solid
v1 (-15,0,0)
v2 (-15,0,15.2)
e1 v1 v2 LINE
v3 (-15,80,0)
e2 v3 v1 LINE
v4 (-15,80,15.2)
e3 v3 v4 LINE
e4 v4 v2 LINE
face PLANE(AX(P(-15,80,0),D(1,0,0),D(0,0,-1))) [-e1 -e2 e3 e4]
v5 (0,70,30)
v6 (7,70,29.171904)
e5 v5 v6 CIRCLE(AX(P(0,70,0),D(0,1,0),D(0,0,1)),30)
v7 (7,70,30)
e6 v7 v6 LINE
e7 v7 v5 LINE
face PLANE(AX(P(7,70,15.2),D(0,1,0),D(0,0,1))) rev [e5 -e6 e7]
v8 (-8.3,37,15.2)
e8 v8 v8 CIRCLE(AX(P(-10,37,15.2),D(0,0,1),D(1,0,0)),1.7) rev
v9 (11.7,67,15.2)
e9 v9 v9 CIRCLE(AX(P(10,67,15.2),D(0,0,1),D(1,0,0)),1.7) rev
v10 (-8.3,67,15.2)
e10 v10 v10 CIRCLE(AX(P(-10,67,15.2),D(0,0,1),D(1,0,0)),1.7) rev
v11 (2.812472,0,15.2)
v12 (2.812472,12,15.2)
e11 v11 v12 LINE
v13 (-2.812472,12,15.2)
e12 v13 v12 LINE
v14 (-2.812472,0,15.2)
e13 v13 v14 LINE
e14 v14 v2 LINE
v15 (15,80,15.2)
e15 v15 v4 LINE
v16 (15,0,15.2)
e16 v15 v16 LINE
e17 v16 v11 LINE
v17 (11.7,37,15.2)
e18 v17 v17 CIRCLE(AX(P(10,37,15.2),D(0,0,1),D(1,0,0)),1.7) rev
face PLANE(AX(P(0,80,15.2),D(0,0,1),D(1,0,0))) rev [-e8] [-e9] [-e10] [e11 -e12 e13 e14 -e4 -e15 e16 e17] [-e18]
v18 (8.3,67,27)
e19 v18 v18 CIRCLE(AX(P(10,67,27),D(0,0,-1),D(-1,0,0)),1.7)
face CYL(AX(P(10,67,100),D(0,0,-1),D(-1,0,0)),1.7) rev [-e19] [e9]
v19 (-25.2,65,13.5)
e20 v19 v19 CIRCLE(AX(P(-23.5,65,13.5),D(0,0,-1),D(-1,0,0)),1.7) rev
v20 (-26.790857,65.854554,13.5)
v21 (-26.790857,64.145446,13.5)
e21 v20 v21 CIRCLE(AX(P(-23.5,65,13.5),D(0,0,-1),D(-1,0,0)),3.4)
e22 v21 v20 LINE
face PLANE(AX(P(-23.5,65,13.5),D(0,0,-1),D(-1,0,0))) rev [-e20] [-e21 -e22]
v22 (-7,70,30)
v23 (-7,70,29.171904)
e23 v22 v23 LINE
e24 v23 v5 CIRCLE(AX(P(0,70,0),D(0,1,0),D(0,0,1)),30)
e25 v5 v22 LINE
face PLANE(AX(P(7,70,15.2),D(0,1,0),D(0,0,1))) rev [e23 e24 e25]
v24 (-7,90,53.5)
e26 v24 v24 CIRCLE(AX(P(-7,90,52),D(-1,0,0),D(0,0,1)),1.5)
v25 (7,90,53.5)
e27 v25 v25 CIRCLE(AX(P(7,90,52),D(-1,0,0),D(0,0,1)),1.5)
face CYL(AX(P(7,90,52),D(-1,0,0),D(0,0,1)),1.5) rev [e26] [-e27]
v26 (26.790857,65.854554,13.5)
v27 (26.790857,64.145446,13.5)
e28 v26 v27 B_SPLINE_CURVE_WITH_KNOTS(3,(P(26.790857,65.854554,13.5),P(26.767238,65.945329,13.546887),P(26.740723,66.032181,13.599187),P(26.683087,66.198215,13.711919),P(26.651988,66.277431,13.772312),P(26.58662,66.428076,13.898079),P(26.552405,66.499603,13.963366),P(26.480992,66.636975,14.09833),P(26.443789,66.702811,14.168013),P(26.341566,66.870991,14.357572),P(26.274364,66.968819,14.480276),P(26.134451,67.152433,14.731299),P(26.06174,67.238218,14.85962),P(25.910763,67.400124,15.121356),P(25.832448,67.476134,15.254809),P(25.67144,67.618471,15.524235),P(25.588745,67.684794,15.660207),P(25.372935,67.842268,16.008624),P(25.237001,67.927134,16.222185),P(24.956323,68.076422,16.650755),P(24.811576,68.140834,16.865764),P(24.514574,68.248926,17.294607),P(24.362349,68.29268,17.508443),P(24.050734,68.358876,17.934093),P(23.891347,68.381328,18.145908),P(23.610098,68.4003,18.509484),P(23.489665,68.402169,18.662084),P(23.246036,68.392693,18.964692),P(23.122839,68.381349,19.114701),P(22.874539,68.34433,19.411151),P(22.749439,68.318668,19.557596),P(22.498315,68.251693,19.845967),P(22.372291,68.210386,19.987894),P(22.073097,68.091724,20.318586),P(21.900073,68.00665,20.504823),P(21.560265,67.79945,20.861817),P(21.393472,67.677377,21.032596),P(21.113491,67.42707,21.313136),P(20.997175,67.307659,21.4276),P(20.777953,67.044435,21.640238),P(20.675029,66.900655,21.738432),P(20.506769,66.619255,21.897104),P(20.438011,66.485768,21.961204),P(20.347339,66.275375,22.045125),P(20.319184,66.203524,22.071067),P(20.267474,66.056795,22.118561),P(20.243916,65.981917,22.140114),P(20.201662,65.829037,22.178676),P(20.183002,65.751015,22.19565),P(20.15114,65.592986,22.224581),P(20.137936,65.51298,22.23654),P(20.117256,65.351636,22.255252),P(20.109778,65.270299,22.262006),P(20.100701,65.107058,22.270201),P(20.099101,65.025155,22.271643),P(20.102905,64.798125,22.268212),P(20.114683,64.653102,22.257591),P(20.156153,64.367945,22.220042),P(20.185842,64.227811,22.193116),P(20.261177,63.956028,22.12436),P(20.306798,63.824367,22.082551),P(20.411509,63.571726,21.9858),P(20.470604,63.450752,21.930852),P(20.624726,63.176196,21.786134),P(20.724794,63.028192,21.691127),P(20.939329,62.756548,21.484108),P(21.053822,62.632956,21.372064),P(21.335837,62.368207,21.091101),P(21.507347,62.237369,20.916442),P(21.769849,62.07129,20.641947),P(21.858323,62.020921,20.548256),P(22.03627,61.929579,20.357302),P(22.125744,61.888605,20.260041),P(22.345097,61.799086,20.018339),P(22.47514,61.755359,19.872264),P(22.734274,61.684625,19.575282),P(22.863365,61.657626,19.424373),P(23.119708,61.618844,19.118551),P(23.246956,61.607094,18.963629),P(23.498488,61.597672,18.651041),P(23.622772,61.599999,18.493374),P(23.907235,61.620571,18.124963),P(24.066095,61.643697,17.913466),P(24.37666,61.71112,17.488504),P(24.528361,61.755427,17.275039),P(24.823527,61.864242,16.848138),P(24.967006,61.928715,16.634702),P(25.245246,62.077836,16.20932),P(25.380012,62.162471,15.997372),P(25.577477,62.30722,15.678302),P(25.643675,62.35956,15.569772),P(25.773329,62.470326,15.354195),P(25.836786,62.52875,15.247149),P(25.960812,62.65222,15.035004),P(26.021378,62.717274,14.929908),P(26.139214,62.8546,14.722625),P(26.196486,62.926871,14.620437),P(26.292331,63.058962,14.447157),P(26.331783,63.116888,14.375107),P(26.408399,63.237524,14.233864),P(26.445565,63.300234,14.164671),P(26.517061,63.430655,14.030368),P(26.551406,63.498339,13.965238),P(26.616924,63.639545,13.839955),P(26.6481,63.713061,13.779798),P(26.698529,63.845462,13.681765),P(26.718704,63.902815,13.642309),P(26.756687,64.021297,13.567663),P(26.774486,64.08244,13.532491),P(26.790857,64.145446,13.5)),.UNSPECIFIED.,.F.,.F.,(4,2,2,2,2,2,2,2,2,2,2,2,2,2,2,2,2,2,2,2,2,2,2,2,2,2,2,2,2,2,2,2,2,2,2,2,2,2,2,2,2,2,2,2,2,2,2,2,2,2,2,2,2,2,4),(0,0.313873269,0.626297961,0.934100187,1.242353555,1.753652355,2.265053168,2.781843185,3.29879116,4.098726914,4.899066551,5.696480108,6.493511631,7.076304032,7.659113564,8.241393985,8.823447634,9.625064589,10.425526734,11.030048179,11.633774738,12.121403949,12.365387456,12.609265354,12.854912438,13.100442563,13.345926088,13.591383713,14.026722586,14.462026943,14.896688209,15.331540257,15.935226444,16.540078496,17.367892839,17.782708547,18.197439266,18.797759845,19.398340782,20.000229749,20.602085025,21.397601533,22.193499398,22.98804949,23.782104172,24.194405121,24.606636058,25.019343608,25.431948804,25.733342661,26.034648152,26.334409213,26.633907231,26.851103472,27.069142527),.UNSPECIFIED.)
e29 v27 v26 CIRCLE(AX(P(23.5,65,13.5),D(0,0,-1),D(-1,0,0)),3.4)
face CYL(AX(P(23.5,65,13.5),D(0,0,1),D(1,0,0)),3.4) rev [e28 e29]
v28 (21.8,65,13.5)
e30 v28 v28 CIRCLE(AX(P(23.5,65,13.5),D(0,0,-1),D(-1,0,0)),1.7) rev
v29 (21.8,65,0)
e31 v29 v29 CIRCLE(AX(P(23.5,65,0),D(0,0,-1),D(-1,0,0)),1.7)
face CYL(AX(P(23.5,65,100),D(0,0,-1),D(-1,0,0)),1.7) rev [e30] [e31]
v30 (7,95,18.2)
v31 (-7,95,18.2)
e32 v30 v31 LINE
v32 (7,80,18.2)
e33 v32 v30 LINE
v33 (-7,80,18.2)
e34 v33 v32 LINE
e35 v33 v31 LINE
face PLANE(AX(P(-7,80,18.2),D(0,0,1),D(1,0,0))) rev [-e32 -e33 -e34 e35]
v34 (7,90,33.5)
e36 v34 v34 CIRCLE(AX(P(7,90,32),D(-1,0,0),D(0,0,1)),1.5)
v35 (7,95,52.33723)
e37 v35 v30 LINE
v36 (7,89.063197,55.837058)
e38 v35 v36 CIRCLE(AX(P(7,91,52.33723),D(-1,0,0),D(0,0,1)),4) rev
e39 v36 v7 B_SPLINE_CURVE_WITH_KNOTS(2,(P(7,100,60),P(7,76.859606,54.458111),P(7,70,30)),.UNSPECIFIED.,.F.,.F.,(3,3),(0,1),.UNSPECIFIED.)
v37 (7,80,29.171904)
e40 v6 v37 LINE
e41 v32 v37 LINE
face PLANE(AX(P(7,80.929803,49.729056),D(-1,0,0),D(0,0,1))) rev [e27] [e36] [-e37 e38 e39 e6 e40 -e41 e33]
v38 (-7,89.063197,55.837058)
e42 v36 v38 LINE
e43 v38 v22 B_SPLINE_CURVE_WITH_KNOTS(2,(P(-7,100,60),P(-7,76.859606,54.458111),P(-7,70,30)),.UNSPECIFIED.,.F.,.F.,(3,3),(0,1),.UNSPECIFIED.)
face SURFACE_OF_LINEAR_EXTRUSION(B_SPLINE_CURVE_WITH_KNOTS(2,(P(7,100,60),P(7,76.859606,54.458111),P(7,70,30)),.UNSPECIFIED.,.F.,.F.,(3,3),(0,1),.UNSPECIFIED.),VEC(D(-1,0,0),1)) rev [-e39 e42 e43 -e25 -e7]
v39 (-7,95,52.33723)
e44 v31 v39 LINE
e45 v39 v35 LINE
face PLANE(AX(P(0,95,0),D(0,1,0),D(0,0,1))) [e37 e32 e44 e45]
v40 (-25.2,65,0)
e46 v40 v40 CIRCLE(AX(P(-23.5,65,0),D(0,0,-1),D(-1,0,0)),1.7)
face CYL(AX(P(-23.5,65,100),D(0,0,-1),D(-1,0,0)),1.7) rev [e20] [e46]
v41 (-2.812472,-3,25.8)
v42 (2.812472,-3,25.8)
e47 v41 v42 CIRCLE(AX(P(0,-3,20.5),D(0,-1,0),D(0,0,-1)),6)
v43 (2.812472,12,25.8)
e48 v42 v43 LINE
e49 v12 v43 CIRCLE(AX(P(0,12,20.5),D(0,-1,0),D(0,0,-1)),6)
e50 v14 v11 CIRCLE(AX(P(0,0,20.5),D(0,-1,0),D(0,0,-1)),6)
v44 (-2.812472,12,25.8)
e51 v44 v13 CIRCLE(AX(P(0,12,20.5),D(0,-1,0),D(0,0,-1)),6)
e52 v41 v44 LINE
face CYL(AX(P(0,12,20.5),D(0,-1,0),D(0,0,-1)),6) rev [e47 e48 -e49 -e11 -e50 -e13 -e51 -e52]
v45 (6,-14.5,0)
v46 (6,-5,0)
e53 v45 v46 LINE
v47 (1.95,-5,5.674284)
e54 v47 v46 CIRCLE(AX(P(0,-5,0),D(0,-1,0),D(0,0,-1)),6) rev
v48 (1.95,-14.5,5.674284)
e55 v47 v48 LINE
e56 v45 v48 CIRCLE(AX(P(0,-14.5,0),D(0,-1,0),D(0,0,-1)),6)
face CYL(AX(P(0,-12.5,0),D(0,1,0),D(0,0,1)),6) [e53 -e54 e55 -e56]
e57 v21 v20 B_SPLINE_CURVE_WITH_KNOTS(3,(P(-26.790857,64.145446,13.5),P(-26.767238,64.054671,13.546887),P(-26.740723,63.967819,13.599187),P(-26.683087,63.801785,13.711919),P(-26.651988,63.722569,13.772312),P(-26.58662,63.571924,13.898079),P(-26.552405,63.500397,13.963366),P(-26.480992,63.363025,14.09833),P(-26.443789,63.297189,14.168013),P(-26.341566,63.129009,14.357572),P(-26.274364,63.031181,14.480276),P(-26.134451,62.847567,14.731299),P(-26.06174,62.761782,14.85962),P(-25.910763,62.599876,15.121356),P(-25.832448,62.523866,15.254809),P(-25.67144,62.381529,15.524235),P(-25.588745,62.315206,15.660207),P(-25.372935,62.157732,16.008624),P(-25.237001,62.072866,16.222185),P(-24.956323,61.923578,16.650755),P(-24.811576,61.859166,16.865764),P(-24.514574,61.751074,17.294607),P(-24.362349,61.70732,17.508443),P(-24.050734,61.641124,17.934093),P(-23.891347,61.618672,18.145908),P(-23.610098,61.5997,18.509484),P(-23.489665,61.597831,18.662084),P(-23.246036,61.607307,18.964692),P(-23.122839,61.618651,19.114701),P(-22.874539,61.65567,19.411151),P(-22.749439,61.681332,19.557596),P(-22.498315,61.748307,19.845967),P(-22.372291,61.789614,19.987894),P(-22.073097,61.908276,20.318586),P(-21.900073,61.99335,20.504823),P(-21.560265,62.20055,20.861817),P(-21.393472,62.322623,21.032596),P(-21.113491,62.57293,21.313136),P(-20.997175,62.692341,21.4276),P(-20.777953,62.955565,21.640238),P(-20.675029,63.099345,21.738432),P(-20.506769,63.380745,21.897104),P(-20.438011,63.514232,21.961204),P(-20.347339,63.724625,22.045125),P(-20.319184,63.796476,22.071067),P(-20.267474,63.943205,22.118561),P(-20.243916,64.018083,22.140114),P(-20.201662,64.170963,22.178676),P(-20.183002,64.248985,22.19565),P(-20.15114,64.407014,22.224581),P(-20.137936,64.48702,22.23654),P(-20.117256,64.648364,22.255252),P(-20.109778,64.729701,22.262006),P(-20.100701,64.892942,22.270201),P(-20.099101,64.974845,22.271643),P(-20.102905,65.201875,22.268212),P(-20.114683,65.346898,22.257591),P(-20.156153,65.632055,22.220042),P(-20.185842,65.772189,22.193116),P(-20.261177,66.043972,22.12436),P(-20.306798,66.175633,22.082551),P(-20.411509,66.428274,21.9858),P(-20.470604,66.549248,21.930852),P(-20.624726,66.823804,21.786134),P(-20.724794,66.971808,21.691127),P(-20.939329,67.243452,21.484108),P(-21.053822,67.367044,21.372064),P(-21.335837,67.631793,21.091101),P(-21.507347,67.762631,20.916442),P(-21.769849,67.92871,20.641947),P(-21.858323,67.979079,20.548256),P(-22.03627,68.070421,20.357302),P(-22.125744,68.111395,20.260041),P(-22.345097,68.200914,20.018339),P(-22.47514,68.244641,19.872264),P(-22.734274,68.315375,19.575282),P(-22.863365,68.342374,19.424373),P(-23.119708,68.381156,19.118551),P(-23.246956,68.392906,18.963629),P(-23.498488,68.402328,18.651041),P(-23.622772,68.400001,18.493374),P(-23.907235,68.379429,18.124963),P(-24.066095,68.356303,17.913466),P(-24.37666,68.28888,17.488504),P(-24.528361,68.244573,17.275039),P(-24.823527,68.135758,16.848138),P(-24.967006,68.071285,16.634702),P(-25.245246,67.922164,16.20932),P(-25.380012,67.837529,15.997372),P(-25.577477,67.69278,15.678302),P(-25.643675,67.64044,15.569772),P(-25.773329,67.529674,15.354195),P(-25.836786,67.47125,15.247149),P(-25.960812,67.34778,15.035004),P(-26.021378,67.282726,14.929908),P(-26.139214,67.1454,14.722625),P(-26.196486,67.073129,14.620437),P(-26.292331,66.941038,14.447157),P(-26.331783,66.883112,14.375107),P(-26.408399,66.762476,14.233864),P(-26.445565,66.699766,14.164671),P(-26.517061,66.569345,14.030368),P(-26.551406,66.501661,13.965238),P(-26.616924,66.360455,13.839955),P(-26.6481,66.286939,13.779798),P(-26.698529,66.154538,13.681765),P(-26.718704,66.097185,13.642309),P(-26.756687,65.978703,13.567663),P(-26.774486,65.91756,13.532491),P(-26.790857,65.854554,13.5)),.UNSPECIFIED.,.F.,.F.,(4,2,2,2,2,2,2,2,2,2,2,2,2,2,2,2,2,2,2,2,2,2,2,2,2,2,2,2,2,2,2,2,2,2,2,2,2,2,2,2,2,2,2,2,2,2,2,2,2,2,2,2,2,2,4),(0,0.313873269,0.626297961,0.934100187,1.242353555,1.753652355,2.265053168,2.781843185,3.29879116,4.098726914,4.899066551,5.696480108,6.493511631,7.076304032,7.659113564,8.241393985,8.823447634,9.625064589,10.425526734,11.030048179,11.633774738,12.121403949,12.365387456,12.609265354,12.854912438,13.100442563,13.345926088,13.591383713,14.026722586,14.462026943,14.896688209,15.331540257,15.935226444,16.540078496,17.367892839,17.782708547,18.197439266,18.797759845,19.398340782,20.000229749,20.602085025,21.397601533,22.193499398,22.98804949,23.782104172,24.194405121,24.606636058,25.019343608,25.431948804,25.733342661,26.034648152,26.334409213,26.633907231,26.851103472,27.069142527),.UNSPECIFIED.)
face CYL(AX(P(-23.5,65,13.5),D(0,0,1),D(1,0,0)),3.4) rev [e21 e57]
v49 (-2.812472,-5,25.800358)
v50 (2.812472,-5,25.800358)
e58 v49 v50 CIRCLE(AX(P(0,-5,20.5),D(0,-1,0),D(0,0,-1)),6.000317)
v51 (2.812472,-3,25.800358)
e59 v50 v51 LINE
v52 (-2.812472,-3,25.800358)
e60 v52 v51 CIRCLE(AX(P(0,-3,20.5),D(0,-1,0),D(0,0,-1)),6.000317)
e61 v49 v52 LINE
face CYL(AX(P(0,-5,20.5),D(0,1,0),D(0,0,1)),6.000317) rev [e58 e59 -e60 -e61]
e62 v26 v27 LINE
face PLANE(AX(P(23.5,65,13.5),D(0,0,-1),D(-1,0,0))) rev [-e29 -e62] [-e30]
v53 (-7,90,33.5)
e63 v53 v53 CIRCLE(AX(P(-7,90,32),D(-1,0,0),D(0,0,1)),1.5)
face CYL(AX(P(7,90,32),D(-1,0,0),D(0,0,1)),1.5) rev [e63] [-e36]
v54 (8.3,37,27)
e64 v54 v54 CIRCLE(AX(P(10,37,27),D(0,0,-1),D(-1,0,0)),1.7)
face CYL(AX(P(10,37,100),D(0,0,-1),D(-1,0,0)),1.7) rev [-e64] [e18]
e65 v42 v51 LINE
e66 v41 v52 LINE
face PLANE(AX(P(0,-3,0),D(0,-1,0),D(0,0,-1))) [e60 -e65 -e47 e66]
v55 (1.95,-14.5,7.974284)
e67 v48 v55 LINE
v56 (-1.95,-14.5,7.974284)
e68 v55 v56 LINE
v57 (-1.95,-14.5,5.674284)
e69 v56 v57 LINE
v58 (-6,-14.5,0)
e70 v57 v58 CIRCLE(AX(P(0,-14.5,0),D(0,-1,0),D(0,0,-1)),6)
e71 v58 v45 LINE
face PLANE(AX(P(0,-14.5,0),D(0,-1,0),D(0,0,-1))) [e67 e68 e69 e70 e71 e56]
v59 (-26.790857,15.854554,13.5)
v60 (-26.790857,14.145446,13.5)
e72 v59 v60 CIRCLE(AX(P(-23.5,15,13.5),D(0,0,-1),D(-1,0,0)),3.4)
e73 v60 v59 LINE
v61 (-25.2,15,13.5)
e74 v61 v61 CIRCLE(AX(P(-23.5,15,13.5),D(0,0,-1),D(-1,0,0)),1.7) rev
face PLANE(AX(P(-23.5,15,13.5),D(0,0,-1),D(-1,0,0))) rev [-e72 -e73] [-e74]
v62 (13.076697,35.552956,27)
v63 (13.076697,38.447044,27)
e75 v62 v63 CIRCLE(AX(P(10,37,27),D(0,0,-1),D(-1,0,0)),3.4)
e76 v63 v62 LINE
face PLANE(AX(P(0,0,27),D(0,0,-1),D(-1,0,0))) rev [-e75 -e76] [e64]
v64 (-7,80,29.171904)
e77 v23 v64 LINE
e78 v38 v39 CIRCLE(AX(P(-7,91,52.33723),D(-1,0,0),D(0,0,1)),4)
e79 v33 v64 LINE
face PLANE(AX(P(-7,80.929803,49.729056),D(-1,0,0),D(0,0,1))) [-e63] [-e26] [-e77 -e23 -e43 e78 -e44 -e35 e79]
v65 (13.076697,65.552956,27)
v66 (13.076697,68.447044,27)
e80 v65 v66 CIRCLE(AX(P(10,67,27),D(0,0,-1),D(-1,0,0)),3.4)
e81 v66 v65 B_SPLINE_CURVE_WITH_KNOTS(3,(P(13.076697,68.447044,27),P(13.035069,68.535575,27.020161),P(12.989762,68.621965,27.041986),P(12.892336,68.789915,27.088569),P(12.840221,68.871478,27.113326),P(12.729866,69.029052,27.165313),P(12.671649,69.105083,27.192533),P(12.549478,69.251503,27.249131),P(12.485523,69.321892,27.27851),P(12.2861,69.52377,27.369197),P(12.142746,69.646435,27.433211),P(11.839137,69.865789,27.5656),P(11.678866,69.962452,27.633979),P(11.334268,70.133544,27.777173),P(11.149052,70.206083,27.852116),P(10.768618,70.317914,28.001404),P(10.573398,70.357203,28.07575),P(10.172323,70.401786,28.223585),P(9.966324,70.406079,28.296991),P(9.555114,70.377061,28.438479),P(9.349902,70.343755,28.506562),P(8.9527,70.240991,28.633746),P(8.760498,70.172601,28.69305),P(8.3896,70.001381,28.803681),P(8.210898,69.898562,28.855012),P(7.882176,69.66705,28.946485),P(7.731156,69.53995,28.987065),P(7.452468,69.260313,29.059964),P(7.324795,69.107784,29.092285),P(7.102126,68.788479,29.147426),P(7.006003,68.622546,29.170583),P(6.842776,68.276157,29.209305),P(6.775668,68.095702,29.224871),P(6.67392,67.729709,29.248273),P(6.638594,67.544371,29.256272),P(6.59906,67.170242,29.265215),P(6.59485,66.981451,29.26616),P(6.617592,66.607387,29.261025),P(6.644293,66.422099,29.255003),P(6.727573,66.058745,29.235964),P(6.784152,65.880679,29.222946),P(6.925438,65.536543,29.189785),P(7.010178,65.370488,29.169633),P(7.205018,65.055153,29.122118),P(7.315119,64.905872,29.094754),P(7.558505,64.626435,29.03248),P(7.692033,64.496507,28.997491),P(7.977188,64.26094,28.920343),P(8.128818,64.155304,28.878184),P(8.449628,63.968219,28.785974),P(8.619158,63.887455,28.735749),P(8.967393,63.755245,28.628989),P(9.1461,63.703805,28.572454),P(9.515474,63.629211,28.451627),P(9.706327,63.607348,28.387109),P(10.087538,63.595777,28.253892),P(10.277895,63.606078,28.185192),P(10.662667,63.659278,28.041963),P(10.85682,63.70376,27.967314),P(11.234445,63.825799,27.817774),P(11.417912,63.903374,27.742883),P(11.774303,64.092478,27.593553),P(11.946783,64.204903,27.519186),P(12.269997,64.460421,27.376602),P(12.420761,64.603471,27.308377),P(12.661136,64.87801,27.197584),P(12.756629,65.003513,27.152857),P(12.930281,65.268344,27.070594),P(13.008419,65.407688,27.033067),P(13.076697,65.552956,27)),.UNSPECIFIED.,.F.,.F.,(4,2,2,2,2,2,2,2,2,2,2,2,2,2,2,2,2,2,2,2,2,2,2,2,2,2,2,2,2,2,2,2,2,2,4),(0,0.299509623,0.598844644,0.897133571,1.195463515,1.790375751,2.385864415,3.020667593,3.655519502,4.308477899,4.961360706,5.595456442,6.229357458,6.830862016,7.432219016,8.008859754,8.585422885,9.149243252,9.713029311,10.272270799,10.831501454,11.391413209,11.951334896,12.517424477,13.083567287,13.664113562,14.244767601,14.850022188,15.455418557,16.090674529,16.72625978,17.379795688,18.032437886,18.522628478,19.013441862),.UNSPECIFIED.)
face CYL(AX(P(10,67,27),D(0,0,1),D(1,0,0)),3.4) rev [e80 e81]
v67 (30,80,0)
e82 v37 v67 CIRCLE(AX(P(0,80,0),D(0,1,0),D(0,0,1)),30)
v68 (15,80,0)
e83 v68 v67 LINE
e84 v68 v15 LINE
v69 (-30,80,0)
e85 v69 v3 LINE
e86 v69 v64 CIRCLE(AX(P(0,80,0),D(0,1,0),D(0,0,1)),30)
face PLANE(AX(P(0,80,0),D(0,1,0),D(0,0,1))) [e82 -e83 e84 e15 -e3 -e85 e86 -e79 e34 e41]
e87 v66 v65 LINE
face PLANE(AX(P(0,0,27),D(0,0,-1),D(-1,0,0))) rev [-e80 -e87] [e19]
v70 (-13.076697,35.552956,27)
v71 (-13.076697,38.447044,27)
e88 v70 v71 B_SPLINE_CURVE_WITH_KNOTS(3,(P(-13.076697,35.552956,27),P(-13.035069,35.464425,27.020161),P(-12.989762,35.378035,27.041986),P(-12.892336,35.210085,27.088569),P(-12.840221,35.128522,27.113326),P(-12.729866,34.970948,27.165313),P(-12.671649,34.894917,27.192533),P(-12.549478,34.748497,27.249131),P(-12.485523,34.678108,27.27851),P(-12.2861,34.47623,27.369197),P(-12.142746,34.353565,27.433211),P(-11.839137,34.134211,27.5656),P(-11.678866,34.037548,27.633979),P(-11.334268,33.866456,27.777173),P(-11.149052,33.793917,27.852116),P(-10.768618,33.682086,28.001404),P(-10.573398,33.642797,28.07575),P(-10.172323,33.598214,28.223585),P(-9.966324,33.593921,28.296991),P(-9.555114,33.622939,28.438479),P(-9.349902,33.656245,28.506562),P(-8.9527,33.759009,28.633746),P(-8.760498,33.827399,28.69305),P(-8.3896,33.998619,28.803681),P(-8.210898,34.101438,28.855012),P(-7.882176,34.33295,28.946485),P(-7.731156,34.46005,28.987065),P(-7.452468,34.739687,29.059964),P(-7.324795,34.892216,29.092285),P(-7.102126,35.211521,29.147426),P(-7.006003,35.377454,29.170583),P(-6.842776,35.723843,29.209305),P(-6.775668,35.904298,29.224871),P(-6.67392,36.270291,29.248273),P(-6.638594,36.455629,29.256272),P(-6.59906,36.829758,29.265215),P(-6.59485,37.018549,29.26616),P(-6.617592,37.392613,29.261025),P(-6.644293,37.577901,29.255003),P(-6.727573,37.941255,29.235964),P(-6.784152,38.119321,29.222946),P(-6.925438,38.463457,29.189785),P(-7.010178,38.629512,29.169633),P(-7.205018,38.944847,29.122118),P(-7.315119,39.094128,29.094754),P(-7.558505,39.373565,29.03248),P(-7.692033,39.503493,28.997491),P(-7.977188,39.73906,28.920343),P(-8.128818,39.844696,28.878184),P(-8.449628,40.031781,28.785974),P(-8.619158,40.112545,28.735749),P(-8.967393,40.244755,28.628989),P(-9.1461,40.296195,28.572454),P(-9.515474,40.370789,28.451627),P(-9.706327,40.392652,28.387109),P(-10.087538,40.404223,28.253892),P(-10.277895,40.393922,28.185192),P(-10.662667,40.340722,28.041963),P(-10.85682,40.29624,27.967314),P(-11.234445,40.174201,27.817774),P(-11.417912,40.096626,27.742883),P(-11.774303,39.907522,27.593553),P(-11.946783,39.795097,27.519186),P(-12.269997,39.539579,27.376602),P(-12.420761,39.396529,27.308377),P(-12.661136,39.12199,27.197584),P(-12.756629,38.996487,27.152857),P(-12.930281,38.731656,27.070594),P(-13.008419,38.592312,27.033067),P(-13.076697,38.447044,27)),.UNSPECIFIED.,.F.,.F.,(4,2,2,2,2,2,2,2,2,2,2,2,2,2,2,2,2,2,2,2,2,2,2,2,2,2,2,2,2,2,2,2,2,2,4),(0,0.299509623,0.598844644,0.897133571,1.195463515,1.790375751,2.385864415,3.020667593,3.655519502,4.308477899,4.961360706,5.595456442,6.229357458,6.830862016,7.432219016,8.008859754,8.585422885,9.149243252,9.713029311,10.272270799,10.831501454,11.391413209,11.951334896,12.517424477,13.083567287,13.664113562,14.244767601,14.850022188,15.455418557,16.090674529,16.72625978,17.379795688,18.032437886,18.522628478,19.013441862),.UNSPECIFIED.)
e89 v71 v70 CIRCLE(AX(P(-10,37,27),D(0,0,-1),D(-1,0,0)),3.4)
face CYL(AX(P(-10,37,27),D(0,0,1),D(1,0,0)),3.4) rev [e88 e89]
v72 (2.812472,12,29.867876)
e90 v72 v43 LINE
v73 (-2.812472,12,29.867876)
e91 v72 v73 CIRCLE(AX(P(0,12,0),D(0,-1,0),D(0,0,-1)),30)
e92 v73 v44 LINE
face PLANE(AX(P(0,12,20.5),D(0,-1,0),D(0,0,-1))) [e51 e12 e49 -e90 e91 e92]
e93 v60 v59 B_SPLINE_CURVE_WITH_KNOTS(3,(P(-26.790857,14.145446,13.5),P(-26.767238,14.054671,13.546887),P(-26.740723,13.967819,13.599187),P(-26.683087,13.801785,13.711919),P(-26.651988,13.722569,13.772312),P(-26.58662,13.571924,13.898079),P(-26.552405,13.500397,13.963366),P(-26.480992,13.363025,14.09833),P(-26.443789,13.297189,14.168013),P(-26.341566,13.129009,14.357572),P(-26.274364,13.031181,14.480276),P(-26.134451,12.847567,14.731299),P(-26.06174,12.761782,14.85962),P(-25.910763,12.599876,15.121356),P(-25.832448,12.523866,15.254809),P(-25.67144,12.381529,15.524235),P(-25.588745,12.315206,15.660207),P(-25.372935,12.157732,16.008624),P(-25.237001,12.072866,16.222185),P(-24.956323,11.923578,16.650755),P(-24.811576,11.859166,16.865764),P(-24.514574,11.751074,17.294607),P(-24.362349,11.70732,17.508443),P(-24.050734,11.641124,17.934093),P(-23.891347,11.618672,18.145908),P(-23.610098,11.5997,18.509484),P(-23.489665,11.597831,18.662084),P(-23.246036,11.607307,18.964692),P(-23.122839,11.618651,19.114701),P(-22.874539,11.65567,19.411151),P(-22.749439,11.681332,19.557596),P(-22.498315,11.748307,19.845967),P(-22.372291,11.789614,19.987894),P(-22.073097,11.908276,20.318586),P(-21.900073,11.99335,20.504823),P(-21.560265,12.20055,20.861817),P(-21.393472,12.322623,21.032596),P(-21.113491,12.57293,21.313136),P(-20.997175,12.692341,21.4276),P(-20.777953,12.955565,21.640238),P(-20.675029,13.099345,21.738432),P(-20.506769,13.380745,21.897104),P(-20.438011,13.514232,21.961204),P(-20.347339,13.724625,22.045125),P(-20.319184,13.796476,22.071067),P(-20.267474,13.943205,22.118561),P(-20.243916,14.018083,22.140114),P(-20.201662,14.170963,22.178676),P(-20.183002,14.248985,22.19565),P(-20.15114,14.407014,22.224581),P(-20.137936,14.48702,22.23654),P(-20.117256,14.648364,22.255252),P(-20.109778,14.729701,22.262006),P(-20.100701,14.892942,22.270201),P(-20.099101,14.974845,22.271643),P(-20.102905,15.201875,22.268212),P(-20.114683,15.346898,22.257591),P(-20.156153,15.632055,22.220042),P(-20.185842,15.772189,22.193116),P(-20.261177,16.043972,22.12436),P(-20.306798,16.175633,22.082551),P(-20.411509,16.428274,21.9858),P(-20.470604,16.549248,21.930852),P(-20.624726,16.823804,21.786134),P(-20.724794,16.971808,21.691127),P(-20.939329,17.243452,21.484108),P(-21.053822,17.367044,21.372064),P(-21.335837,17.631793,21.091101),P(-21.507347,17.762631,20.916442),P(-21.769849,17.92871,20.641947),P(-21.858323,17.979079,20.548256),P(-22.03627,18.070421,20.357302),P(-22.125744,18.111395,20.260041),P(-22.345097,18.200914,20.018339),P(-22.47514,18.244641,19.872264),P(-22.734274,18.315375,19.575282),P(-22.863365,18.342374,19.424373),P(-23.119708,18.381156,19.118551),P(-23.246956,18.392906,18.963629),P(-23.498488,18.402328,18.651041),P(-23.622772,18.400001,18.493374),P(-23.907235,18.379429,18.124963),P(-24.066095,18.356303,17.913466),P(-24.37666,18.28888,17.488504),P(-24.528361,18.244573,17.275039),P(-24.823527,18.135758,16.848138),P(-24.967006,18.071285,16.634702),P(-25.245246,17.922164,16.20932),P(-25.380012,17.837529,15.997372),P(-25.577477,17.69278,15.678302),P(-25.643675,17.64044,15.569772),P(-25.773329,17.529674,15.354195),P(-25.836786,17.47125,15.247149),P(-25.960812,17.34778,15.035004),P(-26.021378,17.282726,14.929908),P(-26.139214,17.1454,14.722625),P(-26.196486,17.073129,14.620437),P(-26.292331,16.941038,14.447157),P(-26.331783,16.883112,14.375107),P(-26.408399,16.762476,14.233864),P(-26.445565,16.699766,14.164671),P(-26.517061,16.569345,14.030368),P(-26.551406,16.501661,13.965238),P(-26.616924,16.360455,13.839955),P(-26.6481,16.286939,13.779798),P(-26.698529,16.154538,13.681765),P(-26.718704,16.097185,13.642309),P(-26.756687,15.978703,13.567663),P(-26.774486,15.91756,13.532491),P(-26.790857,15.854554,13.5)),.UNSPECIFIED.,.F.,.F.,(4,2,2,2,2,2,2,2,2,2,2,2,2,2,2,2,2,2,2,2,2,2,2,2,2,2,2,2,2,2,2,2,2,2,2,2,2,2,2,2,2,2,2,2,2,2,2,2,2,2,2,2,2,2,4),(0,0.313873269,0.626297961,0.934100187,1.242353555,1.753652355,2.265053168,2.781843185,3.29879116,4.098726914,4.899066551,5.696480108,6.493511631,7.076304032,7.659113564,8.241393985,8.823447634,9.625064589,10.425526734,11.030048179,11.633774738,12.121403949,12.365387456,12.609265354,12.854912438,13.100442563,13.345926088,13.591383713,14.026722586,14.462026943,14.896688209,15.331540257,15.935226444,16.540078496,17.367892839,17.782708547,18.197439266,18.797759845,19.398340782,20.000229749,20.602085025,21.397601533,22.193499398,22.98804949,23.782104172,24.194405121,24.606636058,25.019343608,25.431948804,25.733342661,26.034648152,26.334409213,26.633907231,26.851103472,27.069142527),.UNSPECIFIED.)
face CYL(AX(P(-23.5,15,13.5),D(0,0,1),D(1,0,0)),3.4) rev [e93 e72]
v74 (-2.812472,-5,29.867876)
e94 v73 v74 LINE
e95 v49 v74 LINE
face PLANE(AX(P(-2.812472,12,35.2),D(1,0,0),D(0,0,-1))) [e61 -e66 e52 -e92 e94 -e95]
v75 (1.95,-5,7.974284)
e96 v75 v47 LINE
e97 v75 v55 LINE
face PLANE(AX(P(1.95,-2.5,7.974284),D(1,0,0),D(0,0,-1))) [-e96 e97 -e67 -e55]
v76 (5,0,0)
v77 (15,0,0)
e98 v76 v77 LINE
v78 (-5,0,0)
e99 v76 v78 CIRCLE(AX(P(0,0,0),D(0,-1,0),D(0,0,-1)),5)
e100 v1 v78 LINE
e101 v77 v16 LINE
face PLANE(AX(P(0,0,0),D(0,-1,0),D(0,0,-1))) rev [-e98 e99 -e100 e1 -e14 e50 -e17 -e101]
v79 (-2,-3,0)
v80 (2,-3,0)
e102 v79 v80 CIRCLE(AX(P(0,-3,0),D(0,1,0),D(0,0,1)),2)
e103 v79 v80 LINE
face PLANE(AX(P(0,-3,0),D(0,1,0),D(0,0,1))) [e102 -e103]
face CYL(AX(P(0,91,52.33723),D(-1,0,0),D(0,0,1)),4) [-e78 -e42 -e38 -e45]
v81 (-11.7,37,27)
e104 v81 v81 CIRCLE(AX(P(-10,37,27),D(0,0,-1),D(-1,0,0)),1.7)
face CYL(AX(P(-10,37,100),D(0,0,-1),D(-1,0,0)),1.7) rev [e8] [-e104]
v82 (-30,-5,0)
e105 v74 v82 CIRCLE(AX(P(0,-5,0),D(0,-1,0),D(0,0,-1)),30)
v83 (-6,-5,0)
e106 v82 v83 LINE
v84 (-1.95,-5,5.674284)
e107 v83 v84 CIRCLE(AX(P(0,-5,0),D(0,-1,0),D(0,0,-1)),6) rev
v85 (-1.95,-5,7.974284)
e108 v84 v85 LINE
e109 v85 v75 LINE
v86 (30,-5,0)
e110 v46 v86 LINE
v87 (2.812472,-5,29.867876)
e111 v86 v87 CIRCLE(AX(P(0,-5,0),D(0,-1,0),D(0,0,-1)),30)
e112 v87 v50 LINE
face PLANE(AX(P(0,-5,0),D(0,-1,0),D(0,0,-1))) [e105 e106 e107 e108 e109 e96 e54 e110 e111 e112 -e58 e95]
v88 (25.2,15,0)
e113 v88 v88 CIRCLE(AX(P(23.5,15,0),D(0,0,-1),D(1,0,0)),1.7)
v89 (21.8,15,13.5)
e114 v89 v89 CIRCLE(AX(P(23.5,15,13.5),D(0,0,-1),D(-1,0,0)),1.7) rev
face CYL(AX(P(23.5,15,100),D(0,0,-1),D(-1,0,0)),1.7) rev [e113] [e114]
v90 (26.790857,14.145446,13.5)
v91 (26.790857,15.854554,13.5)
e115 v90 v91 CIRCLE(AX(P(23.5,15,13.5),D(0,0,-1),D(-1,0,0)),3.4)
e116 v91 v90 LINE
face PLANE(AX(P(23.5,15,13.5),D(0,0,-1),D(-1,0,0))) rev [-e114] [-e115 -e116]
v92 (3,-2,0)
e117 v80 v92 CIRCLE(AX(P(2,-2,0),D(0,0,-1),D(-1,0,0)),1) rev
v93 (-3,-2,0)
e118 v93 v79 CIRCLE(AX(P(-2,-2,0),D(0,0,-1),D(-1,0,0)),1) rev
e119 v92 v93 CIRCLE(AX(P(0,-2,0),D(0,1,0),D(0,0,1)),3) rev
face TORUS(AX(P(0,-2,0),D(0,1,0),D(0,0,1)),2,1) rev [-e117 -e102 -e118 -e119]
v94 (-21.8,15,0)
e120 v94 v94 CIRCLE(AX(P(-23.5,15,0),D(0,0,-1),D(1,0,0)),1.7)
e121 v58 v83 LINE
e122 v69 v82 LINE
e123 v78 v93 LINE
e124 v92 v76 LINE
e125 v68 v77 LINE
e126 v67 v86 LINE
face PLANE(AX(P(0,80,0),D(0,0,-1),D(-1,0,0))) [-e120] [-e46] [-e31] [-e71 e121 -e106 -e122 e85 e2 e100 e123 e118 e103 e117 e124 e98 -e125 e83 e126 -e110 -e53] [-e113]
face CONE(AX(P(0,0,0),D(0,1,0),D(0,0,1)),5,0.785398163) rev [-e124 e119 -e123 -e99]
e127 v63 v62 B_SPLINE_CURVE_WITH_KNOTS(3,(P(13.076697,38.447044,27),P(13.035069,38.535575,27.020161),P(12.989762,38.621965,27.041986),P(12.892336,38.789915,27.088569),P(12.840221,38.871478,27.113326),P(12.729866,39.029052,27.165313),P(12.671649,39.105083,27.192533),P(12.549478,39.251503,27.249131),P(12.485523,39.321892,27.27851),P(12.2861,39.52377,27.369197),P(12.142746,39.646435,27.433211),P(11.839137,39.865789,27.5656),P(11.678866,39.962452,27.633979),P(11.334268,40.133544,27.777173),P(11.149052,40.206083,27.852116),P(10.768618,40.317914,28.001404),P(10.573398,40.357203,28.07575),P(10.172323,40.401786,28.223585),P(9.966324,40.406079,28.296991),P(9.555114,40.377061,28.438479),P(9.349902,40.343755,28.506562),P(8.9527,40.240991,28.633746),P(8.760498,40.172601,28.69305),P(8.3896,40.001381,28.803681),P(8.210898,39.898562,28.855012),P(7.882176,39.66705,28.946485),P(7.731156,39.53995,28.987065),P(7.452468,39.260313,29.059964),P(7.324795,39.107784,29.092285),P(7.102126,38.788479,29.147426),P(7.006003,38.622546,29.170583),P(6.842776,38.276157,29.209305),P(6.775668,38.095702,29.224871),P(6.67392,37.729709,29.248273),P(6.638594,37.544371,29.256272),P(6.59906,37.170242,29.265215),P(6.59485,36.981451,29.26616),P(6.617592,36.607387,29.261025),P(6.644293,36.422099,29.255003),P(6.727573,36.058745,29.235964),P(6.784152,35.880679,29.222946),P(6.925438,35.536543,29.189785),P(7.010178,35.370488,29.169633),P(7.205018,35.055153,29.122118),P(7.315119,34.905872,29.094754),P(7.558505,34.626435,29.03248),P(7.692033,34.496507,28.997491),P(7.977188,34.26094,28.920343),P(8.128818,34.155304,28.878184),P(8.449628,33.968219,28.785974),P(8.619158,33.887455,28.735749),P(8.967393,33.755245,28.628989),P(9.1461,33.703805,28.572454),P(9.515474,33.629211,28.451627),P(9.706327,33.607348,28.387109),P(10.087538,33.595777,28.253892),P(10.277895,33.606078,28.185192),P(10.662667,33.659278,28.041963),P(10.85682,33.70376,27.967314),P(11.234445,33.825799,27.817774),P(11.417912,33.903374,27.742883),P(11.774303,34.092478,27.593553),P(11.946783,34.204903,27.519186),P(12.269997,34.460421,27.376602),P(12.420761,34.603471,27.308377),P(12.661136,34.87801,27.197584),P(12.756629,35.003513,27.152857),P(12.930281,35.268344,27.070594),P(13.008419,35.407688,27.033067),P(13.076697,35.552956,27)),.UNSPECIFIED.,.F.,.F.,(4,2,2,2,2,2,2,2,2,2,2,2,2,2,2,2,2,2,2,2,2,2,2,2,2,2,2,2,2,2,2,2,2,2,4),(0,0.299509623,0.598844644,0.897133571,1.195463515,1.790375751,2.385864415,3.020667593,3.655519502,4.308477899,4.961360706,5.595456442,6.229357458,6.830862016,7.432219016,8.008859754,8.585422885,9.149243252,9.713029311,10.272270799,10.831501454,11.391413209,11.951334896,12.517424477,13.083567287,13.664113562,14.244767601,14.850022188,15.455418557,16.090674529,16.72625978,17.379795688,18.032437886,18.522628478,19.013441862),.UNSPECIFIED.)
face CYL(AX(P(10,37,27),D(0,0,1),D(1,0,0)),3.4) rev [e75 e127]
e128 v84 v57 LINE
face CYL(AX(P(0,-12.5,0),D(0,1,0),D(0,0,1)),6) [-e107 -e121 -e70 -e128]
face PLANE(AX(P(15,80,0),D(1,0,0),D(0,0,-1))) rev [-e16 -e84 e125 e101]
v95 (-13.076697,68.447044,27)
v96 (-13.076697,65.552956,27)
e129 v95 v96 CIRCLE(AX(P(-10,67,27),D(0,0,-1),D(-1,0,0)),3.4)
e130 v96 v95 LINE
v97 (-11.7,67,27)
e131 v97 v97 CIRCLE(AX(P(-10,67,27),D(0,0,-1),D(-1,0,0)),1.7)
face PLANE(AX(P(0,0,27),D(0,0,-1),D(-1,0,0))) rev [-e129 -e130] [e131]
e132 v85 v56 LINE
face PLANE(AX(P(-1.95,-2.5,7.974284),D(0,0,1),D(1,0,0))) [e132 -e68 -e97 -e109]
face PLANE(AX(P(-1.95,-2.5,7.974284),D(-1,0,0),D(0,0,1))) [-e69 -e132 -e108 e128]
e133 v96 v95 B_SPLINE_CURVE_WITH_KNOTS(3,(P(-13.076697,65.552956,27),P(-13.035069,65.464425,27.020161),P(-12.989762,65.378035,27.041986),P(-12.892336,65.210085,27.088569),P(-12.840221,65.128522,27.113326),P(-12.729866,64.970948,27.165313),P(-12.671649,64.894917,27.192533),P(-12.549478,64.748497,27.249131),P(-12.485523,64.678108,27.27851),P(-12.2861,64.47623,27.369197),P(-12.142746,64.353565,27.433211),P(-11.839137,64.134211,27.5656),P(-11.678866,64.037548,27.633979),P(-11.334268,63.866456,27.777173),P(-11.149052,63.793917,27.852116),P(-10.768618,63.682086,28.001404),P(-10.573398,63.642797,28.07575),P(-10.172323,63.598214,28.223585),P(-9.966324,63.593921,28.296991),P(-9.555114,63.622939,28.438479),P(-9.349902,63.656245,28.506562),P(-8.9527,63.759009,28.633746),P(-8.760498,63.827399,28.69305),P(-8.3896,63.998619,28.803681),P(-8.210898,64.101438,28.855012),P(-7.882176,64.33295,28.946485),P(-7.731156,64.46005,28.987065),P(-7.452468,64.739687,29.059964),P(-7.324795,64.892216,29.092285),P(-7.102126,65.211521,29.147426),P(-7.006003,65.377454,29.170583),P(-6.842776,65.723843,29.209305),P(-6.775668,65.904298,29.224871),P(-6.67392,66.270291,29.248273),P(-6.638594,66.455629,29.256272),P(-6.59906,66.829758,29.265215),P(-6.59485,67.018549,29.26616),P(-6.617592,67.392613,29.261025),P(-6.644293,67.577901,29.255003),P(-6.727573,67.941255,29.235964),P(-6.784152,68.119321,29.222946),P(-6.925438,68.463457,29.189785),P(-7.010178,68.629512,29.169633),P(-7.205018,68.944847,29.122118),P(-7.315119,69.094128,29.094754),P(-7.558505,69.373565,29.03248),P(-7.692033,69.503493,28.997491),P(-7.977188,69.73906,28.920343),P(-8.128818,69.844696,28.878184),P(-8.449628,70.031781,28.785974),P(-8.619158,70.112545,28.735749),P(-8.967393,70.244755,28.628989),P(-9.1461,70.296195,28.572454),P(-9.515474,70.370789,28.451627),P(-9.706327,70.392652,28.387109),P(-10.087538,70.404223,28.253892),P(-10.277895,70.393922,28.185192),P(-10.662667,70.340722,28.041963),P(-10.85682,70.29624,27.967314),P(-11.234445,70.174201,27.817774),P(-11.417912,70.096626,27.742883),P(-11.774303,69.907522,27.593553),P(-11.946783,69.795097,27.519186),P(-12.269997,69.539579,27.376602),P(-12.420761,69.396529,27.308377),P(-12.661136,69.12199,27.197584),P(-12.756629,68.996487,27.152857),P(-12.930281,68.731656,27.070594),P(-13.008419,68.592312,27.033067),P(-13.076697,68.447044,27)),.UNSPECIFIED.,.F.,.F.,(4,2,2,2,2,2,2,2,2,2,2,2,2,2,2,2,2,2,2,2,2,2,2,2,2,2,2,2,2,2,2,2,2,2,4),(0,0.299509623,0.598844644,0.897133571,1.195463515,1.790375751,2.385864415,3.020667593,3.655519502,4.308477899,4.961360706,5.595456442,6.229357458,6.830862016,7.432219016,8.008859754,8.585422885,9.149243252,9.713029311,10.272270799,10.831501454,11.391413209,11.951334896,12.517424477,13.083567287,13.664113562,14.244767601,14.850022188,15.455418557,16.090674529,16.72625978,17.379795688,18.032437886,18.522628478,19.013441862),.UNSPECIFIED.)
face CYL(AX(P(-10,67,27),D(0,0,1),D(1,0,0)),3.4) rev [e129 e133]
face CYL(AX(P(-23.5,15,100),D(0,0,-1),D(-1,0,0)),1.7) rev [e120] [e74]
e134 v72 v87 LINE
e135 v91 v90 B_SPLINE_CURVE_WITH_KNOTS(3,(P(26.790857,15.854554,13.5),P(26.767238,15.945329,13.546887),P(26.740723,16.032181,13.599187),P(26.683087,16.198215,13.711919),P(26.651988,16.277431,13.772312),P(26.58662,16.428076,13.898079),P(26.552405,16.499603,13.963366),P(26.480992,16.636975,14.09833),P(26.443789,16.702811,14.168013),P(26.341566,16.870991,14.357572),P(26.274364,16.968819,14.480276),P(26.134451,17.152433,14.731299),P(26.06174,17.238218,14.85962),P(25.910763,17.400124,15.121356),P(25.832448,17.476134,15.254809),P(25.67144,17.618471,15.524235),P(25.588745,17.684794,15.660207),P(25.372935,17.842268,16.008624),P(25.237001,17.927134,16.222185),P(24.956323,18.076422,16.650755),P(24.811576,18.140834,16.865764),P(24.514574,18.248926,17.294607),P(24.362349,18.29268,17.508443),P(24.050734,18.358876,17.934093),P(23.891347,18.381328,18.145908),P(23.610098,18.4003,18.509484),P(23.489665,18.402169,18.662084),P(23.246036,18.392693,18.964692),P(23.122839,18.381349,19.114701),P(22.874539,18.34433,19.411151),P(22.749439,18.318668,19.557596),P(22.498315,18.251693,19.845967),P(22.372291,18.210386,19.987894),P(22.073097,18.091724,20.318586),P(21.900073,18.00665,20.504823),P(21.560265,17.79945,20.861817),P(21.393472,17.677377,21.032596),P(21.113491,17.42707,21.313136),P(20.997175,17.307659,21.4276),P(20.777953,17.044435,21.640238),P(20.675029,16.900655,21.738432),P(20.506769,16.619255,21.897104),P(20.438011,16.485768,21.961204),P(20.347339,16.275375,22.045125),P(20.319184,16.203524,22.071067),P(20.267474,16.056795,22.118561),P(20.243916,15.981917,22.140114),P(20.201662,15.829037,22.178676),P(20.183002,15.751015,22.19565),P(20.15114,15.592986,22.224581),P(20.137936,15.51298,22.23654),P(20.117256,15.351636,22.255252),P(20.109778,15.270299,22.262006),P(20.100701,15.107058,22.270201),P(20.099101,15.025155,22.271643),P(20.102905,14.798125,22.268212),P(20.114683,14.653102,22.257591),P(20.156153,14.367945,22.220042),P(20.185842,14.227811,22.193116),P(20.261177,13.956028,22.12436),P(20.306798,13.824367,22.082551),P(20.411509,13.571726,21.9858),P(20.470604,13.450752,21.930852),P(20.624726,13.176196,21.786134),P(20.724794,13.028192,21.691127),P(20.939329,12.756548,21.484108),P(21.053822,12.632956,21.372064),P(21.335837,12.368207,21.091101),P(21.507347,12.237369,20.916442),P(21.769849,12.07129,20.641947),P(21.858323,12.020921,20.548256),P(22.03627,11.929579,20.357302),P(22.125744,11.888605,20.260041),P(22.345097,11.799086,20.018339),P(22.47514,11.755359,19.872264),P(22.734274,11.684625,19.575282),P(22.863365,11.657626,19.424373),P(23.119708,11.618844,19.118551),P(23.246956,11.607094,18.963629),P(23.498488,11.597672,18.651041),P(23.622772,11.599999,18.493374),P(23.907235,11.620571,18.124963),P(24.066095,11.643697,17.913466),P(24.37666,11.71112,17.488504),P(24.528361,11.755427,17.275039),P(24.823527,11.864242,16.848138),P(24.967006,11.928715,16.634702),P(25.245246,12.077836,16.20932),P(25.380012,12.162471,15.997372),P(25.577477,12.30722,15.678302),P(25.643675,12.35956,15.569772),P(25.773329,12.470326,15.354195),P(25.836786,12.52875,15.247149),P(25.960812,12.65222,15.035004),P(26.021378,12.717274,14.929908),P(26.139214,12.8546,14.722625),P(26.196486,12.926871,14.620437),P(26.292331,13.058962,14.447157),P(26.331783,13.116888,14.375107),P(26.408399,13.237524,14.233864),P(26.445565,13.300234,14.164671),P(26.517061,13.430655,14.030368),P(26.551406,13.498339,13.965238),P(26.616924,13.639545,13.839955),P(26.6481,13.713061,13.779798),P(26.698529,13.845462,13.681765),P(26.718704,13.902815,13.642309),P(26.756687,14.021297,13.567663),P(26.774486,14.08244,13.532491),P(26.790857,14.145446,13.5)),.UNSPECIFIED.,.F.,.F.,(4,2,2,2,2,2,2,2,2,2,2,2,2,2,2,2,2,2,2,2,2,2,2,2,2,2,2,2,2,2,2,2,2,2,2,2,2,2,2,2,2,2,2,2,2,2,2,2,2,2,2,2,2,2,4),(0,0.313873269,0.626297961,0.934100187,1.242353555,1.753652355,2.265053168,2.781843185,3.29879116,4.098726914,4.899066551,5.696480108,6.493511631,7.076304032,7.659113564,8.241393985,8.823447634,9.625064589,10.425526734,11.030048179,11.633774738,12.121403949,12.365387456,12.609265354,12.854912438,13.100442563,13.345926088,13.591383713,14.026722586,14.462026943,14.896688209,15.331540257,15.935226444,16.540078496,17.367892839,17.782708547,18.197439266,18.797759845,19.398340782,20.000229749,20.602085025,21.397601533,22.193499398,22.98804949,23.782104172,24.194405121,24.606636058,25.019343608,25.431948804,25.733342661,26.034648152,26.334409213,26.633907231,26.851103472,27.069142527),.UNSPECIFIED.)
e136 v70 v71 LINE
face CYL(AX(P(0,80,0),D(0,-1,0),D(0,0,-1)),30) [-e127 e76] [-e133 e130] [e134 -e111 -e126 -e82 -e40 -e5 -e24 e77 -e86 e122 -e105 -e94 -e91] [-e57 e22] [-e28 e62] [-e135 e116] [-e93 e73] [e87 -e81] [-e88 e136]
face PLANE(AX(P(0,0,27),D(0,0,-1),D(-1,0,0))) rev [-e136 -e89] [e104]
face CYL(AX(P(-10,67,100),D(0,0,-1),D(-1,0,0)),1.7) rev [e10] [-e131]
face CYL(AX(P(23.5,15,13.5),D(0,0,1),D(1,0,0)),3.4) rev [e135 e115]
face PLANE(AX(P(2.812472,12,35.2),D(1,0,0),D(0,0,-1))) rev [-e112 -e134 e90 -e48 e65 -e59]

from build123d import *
from build123d.topology import SkipClean

# Parameters (mm, degrees)
EXTRUDE_1_DEPTH      = 80
SKETCH_2_R           = 1.7
CUT_EXTRUDE_1_DEPTH  = 100
SKETCH_3_R           = 1.7
CUT_EXTRUDE_2_DEPTH  = 100
SKETCH_4_R           = 3.4
CUT_EXTRUDE_3_DEPTH  = 26.5
SKETCH_5_R           = 3.4
CUT_EXTRUDE_4_DEPTH  = 13
EXTRUDE_START        = 3
EXTRUDE_2_DEPTH      = 3
EXTRUDE_3_DEPTH      = 9.5
EXTRUDE_4_DEPTH      = 7
SKETCH_14_R          = 1.5
CUT_EXTRUDE_6_DEPTH  = 14
SKETCH_18_W          = 14
SKETCH_18_H          = 3
CUT_EXTRUDE_9_DEPTH  = 20
SKETCH_19_R          = 3
CUT_EXTRUDE_10_DEPTH = 3
FILLET_4_R           = 1
CHAMFER_2_SIZE       = 2
EXTRUDE_START_2      = -10
EXTRUDE_5_DEPTH      = 10
SKETCH_25_R          = 6
CUT_EXTRUDE_14_DEPTH = 15
SKETCH_27_W          = 14
SKETCH_27_H          = 41.8
CUT_EXTRUDE_16_DEPTH = 5
FILLET_5_R           = 4
SKETCH_28_W          = 5.624944444
SKETCH_28_H          = 15.290834968
CUT_EXTRUDE_17_DEPTH = 20
EXTRUDE_START_3      = 2
EXTRUDE_6_DEPTH      = 2
EXTRUDE_7_DEPTH      = 2
EXTRUDE_8_DEPTH      = 2


# Some blends are built 0.0001 mm under size
with BuildPart() as part:
    # 草图1 → 凸台-拉伸1 (new body)
    with BuildSketch(Plane(origin=(0, 0, 0), x_dir=(1, 0, 0), z_dir=(0, 1, 0))):
        with BuildLine():
            Line((-15, 0), (-30, 0))
            ThreePointArc((-30, 0), (0, -30), (30, 0))
            Line((30, 0), (15, 0))
            Line((15, 0), (15, -15.2))
            Line((15, -15.2), (-15, -15.2))
            Line((-15, -15.2), (-15, 0))
        make_face()
    extrude(amount=EXTRUDE_1_DEPTH)

    # 草图2 → 切除-拉伸1 (cut)
    with BuildSketch(Plane.XY):
        with Locations(Location((-10, 37, 0), (0, 0, 180))):
            Circle(SKETCH_2_R)
        with Locations(Location((-10, 67, 0), (0, 0, 180))):
            Circle(SKETCH_2_R)
        with Locations(Location((10, 37, 0), (0, 0, 180))):
            Circle(SKETCH_2_R)
        with Locations(Location((10, 67, 0), (0, 0, 180))):
            Circle(SKETCH_2_R)
    extrude(amount=CUT_EXTRUDE_1_DEPTH, mode=Mode.SUBTRACT)

    # 草图3 → 切除-拉伸2 (cut)
    with BuildSketch(Plane(origin=(0, 0, 0), x_dir=(-1, 0, 0), z_dir=(0, 0, -1))):
        with Locations((23.5, 65)):
            Circle(SKETCH_3_R)
        with Locations((-23.5, 65)):
            Circle(SKETCH_3_R)
        with Locations((23.5, 15)):
            Circle(SKETCH_3_R)
        with Locations((-23.5, 15)):
            Circle(SKETCH_3_R)
    extrude(amount=-CUT_EXTRUDE_2_DEPTH, mode=Mode.SUBTRACT)

    # 草图4 → 切除-拉伸3 (cut)
    with BuildSketch(Plane(origin=(0, 0, 40), x_dir=(-1, 0, 0), z_dir=(0, 0, -1))):
        with Locations((-23.5, 65)):
            Circle(SKETCH_4_R)
        with Locations((-23.5, 15)):
            Circle(SKETCH_4_R)
        with Locations((23.5, 65)):
            Circle(SKETCH_4_R)
        with Locations((23.5, 15)):
            Circle(SKETCH_4_R)
    extrude(amount=CUT_EXTRUDE_3_DEPTH, mode=Mode.SUBTRACT)

    # 草图5 → 切除-拉伸4 (cut)
    with BuildSketch(Plane(origin=(0, 0, 40), x_dir=(-1, 0, 0), z_dir=(0, 0, -1))):
        with Locations((-10, 37)):
            Circle(SKETCH_5_R)
        with Locations((10, 37)):
            Circle(SKETCH_5_R)
        with Locations((10, 67)):
            Circle(SKETCH_5_R)
        with Locations((-10, 67)):
            Circle(SKETCH_5_R)
    extrude(amount=CUT_EXTRUDE_4_DEPTH, mode=Mode.SUBTRACT)

    # 草图6 → 凸台-拉伸2 (add)
    with SkipClean():  # the faces are left unmerged after this step: merging them gives an invalid solid
        with BuildSketch(Plane.XZ.offset(EXTRUDE_START)):
            with BuildLine():
                Line((-30, 0), (30, 0))
                ThreePointArc((30, 0), (0, 30), (-30, 0))
            make_face()
        extrude(amount=-EXTRUDE_2_DEPTH)

    # 草图7 → 凸台-拉伸3 (add)
    with SkipClean():  # the faces are left unmerged after this step: merging them gives an invalid solid
        with BuildSketch(Plane.XZ.offset(3)):
            with BuildLine():
                Line((-6, 0), (6, 0))
                ThreePointArc((6, 0), (0, 6), (-6, 0))
            make_face()
        extrude(amount=EXTRUDE_3_DEPTH)

    # 草图13 → 凸台-拉伸4 (add, symmetric)
    with SkipClean():  # the faces are left unmerged after this step: merging them gives an invalid solid
        with BuildSketch(Plane(origin=(0, 0, 0), x_dir=(0, 0, -1), z_dir=(1, 0, 0))):
            with BuildLine():
                Line((-15.2, 100), (-60, 100))
                add(Edge.make_bspline(
                    [(-60, 100), (-54.458111129, 76.859605584), (-30, 70)],
                    knots=[0, 0, 0, 1, 1, 1], degree=2))
                Line((-30, 70), (-15.2, 70))
                Line((-15.2, 70), (-15.2, 100))
            make_face()
        extrude(amount=EXTRUDE_4_DEPTH, both=True)

    # 草图14 → 切除-拉伸6 (cut)
    with SkipClean():  # the faces are left unmerged after this step: merging them gives an invalid solid
        with BuildSketch(Plane.ZY.offset(7)):
            with Locations((32, 90)):
                Circle(SKETCH_14_R)
            with Locations((52, 90)):
                Circle(SKETCH_14_R)
        extrude(amount=-CUT_EXTRUDE_6_DEPTH, mode=Mode.SUBTRACT)

    # 草图18 → 切除-拉伸9 (cut)
    with SkipClean():  # the faces are left unmerged after this step: merging them gives an invalid solid
        with BuildSketch(Plane(origin=(0, 100, 0), x_dir=(1, 0, 0), z_dir=(0, 1, 0))):
            with Locations((0, -16.7)):
                Rectangle(SKETCH_18_W, SKETCH_18_H)
        extrude(amount=-CUT_EXTRUDE_9_DEPTH, mode=Mode.SUBTRACT)

    # 草图19 → 切除-拉伸10 (cut)
    with SkipClean():  # the faces are left unmerged after this step: merging them gives an invalid solid
        with BuildSketch(Plane(origin=(0, 0, 0), x_dir=(1, 0, 0), z_dir=(0, 1, 0))):
            Circle(SKETCH_19_R)
        extrude(amount=-CUT_EXTRUDE_10_DEPTH, mode=Mode.SUBTRACT)

    # 圆角4
    # the kernel refuses this fillet: 1 mm, written as the material it adds along each edge
    with BuildSketch(Plane(origin=(0, -3, 0), x_dir=(-1, 0, 0), z_dir=(0, 0, -1))) as fillet_4_piece_1:
        with BuildLine():
            CenterArc((3 - FILLET_4_R, FILLET_4_R), FILLET_4_R, 270, 90)
            Line((3 - FILLET_4_R, 0), (3, 0))
            Line((3, 0), (3, FILLET_4_R))
        make_face()
    revolve(axis=Axis((0, -3, 0), (0, 1, 0)), revolution_arc=180)

    # 倒角2
    chamfer_2_edges = [part.edges().sort_by_distance(p)[0] for p in [
        (0, 0, 3),
    ]]
    chamfer(chamfer_2_edges, length=CHAMFER_2_SIZE - 0.0001)  # a hair under: the kernel refuses the full size

    # 草图23 → 凸台-拉伸5 (add)
    with BuildSketch(Plane.XZ.offset(12.5).offset(EXTRUDE_START_2)):
        with BuildLine():
            Line((-1.95, 7.974284096), (1.95, 7.974284096))
            Line((1.95, 7.974284096), (1.95, 5.674284096))
            ThreePointArc((1.95, 5.674284096), (0, 6), (-1.95, 5.674284096))
            Line((-1.95, 5.674284096), (-1.95, 7.974284096))
        make_face()
    extrude(amount=EXTRUDE_5_DEPTH)

    # 草图25 → 切除-拉伸14 (cut)
    with BuildSketch(Plane.XZ.offset(3)):
        with Locations(Location((0, 20.5, 0), (0, 0, 270))):
            Circle(SKETCH_25_R)
    extrude(amount=-CUT_EXTRUDE_14_DEPTH, mode=Mode.SUBTRACT)

    # 草图27 → 切除-拉伸16 (cut)
    with BuildSketch(Plane(origin=(0, 100, 0), x_dir=(1, 0, 0), z_dir=(0, 1, 0))):
        with Locations((0, -39.1)):
            Rectangle(SKETCH_27_W, SKETCH_27_H)
    extrude(amount=-CUT_EXTRUDE_16_DEPTH, mode=Mode.SUBTRACT)

    # 圆角5
    fillet_5_edges = [part.edges().sort_by_distance(p)[0] for p in [
        (3.4999997, 95, 58.513859135),
    ]]
    fillet(fillet_5_edges, radius=FILLET_5_R)

    # 草图28 → 切除-拉伸17 (cut)
    with BuildSketch(Plane(origin=(0, 0, 15.2), x_dir=(-1, 0, 0), z_dir=(0, 0, -1))):
        with Locations((0, 4.354582516)):
            Rectangle(SKETCH_28_W, SKETCH_28_H)
    extrude(amount=-CUT_EXTRUDE_17_DEPTH, mode=Mode.SUBTRACT)

    # 草图29 → 凸台-拉伸6 (add)
    with BuildSketch(Plane.XZ.offset(3).offset(EXTRUDE_START_3)):
        with BuildLine():
            ThreePointArc((-2.812472222, 25.800358429), (0, 14.499683385), (2.812472222, 25.800358429))
            Line((2.812472222, 25.800358429), (2.812472222, 29.86787572))
            ThreePointArc((2.812472222, 29.86787572), (22.185289796, 20.194378343), (30, 0))
            Line((30, 0), (6, 0))
            ThreePointArc((6, 0), (4.883646179, 3.485685012), (1.95, 5.674284096))
            Line((1.95, 5.674284096), (1.95, 7.974284096))
            Line((1.95, 7.974284096), (-1.95, 7.974284096))
            Line((-1.95, 7.974284096), (-1.95, 5.674284096))
            ThreePointArc((-1.95, 5.674284096), (-4.883646179, 3.485685012), (-6, 0))
            Line((-6, 0), (-30, 0))
            ThreePointArc((-30, 0), (-22.185289796, 20.194378343), (-2.812472222, 29.86787572))
            Line((-2.812472222, 29.86787572), (-2.812472222, 25.800358429))
        make_face()
    extrude(amount=-EXTRUDE_6_DEPTH)

    # 草图30 → 凸台-拉伸7 (add)
    with BuildSketch(Plane.XZ.offset(12.5)):
        with BuildLine():
            Line((-6, 0), (6, 0))
            ThreePointArc((6, 0), (0, 6), (-6, 0))
        make_face()
    extrude(amount=EXTRUDE_7_DEPTH)

    # 草图31 → 凸台-拉伸8 (add)
    with BuildSketch(Plane.XZ.offset(12.5)):
        with BuildLine():
            Line((1.95, 5.674284096), (1.95, 7.974284096))
            Line((1.95, 7.974284096), (-1.95, 7.974284096))
            Line((-1.95, 7.974284096), (-1.95, 5.674284096))
            ThreePointArc((-1.95, 5.674284096), (0, 6), (1.95, 5.674284096))
        make_face()
    extrude(amount=EXTRUDE_8_DEPTH)


solid = part.part
